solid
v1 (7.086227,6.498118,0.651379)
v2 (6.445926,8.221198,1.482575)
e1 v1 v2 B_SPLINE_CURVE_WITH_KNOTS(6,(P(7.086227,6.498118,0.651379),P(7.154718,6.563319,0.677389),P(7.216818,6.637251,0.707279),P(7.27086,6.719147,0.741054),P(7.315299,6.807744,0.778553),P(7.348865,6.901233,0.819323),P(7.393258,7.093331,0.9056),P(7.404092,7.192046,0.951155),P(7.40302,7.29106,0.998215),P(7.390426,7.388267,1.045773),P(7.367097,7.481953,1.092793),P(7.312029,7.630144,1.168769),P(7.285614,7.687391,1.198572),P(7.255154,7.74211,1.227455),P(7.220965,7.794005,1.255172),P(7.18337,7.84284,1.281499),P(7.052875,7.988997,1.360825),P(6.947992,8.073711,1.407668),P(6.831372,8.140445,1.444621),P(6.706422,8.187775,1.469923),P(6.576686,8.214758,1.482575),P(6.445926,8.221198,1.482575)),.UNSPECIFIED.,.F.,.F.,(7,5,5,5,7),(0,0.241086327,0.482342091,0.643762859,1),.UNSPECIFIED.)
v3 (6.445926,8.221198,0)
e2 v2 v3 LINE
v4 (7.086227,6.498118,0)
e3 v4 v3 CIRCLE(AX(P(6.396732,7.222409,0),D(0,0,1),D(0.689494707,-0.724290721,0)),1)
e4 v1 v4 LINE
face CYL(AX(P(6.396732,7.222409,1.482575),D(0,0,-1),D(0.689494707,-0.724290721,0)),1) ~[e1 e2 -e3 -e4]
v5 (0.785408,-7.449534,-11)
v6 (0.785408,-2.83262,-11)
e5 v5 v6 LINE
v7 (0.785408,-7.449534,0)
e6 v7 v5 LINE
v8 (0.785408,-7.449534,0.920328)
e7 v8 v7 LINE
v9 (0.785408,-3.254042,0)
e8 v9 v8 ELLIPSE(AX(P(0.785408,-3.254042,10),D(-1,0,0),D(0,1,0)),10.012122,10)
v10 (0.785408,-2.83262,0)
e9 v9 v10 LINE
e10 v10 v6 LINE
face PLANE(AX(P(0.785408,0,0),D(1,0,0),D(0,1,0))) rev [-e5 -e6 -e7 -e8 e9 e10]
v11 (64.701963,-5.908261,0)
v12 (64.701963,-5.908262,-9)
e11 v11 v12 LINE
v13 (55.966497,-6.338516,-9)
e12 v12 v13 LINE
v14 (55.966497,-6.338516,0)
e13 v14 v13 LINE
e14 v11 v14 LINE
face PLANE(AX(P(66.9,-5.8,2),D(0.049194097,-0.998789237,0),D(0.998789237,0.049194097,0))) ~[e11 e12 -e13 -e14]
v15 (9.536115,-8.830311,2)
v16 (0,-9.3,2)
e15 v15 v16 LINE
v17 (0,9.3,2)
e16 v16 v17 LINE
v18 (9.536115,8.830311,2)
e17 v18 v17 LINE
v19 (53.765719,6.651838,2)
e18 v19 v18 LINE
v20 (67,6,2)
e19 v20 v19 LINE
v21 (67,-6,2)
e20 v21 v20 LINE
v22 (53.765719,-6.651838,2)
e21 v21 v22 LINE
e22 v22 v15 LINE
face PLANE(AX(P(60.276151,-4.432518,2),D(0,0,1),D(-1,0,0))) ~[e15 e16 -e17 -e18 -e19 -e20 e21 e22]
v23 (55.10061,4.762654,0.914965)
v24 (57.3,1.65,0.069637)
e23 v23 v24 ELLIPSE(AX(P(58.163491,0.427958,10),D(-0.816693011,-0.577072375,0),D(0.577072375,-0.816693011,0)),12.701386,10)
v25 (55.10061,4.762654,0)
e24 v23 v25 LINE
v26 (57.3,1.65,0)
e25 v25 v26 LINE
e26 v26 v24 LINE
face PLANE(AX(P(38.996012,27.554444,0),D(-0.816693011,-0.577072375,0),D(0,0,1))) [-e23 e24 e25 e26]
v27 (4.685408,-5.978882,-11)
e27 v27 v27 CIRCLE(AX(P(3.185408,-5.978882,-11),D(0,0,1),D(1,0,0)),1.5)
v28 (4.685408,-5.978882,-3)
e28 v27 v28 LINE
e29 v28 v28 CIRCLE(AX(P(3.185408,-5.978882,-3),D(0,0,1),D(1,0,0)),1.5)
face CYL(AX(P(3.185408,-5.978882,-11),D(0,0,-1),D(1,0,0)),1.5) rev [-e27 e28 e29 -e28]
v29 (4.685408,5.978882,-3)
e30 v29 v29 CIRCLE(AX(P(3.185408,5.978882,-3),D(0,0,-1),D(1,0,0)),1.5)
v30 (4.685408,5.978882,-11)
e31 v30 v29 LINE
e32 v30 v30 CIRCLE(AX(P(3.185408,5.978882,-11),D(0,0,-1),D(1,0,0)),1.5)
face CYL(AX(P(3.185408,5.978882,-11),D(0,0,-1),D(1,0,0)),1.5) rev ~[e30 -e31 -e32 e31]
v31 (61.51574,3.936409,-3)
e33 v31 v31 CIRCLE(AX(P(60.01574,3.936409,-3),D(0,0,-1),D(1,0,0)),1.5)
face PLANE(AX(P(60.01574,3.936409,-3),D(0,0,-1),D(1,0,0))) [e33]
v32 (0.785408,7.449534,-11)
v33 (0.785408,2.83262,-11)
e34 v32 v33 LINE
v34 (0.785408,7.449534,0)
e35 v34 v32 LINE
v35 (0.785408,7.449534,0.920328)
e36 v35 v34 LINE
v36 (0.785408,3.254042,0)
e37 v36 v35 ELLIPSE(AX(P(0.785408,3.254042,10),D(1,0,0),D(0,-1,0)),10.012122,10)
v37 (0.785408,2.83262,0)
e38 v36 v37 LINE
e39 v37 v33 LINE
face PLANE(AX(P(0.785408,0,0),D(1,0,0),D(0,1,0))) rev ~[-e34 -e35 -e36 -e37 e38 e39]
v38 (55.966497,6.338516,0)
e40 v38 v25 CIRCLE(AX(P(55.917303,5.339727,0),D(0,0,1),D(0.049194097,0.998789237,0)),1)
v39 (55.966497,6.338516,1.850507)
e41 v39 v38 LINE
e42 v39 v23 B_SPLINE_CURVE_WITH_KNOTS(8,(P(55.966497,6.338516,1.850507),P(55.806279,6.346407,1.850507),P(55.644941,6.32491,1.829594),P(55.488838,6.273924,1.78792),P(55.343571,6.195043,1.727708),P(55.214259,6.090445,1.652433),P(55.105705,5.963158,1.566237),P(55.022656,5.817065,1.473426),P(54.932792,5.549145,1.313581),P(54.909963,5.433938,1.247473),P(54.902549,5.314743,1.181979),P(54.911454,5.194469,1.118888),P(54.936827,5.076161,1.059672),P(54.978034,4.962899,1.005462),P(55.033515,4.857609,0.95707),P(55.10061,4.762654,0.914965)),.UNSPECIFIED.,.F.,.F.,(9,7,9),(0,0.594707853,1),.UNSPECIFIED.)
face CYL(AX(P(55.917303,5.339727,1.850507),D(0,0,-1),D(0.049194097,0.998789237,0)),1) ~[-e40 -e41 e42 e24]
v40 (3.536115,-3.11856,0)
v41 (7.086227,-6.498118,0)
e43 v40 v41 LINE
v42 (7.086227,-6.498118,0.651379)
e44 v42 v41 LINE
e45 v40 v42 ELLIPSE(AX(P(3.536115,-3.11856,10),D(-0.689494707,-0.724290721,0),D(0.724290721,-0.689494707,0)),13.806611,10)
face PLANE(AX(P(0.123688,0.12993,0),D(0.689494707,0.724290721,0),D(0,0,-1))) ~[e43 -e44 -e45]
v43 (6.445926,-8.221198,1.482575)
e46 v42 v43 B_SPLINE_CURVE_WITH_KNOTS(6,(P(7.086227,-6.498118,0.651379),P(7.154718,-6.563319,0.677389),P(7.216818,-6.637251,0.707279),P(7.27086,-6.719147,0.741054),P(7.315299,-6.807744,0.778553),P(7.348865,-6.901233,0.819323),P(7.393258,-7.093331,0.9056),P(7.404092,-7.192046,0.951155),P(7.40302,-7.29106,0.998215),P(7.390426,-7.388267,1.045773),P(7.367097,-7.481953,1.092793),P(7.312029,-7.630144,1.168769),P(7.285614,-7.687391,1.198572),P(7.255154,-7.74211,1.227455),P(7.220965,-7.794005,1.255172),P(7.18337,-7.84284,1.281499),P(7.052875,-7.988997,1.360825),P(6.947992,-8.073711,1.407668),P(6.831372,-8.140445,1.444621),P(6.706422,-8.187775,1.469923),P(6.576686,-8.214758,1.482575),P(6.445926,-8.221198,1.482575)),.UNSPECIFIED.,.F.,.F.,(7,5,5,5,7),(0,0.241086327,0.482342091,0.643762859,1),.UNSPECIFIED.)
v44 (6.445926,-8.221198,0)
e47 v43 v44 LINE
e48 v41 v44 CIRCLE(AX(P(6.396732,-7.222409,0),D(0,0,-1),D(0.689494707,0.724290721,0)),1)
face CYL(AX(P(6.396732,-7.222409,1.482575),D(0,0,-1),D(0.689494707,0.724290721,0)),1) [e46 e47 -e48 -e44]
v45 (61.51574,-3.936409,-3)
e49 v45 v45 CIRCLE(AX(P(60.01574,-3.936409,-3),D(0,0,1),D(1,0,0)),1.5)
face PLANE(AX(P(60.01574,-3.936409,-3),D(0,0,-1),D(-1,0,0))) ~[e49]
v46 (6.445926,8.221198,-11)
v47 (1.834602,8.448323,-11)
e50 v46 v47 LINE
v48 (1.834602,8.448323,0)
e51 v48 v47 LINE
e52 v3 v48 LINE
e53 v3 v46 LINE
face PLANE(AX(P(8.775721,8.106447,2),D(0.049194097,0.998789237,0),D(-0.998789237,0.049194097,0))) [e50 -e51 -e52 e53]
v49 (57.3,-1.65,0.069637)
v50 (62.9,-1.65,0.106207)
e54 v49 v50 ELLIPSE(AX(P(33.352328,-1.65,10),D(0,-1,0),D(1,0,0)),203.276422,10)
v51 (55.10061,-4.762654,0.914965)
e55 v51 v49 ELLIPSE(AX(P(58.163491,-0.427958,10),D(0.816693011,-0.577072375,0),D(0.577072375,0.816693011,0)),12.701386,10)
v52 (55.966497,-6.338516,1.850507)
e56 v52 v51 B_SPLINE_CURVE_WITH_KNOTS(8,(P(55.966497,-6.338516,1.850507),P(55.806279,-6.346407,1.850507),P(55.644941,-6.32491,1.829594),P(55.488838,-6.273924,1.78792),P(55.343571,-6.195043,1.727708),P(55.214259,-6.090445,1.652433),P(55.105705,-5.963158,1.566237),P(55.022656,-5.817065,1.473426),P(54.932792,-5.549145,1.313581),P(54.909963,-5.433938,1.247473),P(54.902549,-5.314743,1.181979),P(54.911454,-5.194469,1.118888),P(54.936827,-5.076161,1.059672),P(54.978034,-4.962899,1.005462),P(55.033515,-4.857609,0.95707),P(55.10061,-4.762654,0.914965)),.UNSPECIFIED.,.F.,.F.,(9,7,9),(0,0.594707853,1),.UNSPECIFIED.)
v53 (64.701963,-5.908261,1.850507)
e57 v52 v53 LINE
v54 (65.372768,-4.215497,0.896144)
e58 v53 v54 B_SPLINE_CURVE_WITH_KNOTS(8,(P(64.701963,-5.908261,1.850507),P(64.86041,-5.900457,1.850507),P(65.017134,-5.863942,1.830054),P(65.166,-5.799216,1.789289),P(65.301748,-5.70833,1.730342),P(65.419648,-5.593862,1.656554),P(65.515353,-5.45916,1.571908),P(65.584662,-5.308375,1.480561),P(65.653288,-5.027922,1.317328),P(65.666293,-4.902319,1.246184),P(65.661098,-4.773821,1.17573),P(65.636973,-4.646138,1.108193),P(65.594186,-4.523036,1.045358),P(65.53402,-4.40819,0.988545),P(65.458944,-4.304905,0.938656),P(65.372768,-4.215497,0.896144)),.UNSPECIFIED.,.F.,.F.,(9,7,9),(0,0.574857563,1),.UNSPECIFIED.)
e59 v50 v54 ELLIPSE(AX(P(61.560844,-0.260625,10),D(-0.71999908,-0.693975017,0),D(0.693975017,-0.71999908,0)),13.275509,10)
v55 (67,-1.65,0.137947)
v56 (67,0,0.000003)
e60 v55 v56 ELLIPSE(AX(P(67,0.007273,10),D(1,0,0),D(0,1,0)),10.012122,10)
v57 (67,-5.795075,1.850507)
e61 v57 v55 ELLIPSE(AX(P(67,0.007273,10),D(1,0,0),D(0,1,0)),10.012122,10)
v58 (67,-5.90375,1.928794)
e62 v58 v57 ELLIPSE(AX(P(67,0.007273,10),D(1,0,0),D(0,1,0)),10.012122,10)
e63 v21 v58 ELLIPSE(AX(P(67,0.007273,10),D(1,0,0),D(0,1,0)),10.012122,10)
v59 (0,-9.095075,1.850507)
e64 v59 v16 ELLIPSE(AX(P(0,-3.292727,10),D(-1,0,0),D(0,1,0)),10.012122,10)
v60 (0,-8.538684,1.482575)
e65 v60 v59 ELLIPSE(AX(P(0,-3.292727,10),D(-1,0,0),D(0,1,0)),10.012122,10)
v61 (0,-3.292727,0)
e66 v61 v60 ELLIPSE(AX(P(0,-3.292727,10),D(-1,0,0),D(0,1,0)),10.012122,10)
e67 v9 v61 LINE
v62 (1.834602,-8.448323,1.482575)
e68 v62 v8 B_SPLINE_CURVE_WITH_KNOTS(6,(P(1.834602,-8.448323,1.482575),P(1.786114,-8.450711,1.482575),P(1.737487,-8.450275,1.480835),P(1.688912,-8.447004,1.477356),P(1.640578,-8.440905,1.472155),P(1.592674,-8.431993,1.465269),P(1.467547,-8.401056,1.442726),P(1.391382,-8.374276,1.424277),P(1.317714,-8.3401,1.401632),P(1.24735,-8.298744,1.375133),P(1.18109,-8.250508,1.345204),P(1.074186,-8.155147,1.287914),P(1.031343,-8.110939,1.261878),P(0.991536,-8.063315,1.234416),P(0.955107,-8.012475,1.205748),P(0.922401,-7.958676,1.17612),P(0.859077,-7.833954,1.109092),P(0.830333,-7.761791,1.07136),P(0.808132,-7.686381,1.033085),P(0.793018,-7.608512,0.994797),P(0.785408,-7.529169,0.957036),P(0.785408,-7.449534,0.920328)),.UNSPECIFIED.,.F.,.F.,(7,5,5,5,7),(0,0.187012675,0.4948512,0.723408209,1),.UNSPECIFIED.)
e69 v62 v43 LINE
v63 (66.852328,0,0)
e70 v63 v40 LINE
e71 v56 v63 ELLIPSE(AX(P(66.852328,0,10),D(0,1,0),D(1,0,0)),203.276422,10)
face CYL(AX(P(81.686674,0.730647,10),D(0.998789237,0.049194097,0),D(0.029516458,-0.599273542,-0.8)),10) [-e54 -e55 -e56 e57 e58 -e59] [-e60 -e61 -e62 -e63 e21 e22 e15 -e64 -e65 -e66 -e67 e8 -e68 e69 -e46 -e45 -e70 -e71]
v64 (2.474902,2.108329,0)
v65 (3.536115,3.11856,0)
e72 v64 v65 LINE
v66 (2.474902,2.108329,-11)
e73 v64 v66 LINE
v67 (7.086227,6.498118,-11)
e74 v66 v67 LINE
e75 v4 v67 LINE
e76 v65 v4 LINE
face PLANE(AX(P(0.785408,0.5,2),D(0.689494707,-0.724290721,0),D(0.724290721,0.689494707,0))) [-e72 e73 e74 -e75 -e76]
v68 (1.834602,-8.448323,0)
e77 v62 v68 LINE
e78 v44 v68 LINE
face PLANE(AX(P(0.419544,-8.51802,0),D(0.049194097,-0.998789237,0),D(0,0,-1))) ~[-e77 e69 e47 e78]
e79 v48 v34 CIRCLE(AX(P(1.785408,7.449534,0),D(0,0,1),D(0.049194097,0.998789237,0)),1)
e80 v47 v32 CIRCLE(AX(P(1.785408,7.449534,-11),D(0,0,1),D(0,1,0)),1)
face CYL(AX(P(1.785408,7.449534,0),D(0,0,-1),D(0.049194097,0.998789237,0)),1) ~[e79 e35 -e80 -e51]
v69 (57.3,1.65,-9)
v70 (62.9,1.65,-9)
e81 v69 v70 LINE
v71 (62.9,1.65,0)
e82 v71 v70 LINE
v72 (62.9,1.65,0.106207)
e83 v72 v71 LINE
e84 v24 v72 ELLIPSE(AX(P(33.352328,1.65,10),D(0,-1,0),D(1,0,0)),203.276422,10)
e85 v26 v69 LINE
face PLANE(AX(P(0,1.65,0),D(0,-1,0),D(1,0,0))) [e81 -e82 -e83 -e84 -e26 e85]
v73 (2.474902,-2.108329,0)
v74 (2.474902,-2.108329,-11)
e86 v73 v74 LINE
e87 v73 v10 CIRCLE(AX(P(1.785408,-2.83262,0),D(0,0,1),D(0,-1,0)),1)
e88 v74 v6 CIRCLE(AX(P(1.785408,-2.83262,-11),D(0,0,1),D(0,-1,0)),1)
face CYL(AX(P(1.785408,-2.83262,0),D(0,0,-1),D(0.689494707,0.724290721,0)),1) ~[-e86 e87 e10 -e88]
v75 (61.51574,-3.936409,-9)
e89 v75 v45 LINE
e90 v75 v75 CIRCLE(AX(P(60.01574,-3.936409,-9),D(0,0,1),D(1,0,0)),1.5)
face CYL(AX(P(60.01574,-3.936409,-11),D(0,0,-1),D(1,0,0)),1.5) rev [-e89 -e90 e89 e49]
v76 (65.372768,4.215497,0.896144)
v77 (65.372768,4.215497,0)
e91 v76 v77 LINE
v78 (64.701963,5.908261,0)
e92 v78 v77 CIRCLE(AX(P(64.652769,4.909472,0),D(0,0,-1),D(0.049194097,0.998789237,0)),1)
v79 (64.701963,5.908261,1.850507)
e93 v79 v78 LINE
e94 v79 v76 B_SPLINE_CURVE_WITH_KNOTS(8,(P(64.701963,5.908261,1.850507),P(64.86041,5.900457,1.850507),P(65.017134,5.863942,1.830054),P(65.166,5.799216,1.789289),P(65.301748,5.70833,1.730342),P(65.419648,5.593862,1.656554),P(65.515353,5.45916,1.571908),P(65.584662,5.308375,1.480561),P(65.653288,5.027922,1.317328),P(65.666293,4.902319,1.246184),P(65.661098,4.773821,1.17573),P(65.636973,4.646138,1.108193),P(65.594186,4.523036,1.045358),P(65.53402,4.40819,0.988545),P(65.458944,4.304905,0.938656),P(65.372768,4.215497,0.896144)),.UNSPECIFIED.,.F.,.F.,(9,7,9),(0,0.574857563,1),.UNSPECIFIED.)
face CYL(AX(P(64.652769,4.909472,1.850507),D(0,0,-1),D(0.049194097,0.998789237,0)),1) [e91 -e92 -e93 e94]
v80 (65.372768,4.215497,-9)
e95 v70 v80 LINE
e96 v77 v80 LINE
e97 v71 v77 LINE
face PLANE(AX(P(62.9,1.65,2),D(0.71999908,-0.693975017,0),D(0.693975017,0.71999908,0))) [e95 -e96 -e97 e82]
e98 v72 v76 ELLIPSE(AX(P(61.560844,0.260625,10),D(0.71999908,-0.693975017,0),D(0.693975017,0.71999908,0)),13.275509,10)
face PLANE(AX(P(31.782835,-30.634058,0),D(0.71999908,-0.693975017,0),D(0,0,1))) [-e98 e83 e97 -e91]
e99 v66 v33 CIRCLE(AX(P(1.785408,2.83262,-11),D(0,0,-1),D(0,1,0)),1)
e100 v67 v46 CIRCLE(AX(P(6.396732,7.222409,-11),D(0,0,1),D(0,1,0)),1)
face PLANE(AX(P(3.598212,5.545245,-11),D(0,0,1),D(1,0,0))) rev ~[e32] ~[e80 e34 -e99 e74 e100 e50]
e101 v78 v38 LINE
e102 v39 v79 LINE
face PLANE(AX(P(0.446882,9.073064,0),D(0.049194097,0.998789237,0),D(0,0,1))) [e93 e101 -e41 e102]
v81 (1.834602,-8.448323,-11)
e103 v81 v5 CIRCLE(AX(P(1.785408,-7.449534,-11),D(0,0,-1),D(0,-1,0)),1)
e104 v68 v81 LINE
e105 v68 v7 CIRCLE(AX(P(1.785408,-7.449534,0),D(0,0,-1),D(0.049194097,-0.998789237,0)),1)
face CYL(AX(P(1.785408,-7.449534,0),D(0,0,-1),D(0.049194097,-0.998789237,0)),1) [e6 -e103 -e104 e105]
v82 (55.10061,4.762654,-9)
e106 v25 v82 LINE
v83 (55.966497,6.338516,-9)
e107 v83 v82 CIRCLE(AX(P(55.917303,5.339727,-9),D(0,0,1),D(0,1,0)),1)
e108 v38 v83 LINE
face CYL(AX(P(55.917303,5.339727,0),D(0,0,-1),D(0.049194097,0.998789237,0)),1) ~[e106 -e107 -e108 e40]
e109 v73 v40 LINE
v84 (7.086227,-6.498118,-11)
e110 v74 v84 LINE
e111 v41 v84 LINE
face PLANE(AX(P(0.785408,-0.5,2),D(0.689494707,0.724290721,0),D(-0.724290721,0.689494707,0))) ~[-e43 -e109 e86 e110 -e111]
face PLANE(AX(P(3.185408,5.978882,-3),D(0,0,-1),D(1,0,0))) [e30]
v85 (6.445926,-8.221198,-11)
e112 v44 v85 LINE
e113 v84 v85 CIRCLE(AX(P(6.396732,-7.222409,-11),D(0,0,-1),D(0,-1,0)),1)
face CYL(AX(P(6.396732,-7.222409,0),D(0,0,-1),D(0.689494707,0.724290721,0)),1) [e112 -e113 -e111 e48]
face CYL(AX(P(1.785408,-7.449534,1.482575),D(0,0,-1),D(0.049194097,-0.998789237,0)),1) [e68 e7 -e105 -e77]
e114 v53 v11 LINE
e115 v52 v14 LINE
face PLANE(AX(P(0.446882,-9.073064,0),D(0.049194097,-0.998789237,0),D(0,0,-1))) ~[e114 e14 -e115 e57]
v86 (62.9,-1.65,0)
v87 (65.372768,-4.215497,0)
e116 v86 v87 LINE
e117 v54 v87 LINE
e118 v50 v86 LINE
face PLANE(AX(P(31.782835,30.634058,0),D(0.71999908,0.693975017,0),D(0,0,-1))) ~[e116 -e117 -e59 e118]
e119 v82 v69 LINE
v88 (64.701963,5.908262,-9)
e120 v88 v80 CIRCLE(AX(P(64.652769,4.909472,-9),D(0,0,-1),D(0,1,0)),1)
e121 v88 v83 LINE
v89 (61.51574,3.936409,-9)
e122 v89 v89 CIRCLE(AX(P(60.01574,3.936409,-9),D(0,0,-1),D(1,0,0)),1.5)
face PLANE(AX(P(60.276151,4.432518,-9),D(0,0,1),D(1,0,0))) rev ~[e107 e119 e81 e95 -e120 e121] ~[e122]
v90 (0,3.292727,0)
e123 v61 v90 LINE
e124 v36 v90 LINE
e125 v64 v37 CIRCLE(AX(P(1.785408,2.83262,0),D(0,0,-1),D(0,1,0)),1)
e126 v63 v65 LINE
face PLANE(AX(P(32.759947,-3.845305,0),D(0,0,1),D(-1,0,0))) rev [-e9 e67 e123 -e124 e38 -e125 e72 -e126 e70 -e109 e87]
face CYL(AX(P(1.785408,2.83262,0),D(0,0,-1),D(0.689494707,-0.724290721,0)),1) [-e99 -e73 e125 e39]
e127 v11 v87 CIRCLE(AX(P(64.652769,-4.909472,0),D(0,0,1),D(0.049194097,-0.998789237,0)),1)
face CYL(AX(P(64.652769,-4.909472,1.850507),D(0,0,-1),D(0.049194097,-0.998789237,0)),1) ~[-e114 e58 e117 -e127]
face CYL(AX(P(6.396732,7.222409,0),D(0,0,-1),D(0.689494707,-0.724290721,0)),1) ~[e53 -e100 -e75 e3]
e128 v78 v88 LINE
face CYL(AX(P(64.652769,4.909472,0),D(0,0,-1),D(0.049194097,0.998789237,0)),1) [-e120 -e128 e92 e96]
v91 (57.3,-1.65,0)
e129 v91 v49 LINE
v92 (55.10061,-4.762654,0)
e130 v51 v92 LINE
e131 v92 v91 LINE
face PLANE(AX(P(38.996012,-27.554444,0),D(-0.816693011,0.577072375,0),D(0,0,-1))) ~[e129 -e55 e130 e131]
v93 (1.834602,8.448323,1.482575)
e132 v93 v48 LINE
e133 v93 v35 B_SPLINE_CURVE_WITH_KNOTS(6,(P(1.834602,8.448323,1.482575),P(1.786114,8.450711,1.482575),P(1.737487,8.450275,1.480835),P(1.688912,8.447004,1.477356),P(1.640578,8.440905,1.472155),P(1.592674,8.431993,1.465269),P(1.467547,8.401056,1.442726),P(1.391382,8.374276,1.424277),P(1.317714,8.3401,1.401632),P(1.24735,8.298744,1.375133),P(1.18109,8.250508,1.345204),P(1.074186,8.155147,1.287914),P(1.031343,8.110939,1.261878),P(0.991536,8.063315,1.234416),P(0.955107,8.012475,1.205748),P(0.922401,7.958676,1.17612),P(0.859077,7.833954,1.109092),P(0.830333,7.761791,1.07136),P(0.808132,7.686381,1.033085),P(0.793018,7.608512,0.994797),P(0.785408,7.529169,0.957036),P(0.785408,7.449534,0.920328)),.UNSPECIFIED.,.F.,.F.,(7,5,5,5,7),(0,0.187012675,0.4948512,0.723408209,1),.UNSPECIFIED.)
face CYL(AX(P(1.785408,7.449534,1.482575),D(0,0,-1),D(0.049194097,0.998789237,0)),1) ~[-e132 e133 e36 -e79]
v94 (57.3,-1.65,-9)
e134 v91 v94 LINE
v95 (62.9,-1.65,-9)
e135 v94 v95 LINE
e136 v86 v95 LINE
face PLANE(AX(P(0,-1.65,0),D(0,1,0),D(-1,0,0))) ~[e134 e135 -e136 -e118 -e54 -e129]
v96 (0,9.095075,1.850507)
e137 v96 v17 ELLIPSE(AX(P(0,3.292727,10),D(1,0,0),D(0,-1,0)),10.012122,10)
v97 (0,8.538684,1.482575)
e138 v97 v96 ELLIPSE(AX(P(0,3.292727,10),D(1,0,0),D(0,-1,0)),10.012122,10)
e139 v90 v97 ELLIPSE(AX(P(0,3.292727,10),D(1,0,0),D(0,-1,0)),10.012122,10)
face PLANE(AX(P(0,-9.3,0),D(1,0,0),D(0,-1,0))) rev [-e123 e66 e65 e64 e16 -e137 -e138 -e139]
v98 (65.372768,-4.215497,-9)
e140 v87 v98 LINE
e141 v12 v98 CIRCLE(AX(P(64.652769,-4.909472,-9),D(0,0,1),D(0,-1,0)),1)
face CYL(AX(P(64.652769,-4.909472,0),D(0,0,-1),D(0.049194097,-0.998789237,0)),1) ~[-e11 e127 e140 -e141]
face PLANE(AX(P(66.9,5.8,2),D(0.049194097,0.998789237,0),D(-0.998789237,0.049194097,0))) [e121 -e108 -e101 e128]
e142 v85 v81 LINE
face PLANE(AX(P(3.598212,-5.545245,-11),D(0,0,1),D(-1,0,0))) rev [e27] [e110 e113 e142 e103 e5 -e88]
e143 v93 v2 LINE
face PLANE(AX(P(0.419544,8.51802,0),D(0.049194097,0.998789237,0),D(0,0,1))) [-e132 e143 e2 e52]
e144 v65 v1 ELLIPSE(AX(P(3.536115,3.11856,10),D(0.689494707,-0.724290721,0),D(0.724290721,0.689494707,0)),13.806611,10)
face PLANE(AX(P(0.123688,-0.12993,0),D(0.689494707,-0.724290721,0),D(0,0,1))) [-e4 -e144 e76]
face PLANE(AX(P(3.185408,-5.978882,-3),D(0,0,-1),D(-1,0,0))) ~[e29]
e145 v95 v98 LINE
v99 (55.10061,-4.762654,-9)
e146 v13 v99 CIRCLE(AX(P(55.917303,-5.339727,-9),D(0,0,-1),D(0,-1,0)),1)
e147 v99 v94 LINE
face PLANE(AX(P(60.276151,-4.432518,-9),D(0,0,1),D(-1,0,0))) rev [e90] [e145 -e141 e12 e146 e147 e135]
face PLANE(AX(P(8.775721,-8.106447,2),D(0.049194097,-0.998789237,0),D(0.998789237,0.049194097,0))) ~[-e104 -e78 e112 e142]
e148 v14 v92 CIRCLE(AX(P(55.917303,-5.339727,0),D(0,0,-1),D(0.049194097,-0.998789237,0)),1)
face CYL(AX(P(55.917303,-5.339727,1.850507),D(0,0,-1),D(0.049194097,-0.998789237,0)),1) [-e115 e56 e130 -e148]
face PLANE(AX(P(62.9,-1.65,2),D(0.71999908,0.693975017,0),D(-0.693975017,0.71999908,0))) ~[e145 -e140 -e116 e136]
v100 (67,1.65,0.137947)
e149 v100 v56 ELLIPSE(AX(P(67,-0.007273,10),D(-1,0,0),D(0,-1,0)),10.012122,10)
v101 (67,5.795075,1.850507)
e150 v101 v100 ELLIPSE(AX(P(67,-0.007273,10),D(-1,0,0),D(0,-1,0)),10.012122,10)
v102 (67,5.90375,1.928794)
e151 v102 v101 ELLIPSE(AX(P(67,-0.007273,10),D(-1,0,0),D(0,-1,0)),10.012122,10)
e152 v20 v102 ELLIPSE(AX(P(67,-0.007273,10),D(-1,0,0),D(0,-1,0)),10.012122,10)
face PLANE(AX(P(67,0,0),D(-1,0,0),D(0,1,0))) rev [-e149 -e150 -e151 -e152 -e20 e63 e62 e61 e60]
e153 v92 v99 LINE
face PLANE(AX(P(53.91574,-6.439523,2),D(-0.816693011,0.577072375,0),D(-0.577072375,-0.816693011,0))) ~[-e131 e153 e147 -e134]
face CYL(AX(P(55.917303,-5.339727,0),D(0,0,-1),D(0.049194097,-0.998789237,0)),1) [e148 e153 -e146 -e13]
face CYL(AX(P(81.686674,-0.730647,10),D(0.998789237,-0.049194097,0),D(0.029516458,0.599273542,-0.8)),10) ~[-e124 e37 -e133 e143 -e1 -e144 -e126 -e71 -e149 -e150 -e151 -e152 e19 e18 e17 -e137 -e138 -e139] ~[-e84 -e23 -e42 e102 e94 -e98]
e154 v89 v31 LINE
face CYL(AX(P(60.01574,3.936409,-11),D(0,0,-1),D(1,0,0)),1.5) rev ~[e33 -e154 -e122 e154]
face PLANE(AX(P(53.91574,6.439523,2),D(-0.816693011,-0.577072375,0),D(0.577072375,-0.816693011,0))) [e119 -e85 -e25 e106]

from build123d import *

# Parameters (mm, degrees)
F1_DEPTH     = 2
F3_DEPTH     = 13
F4_DEPTH     = 11
F5_R         = 1.5
F6_DEPTH     = 8
F7_T4_DEPTH  = 97.0812194284
F7_T9_DEPTH  = 97.0812194284
F7_T14_DEPTH = 97.0812194284
F7_T20_DEPTH = 97.0812194284
F7_T25_DEPTH = 97.0812194284
F7_T31_DEPTH = 97.0812194284
F8_R         = 1


# Not quite as in the source:
# - a fillet or chamfer that OpenCascade refuses, or shapes differently, is made with other operations: its cross-section is extruded or revolved along the edge and cut away or added


with BuildPart() as f1:
    # F0 (on Top) → F1 (new body)
    with BuildSketch(Plane.XY):
        Polygon((0, 9.3), (0, 0), (67, 0), (67, 6), align=None)
    extrude(amount=F1_DEPTH)

    # F2 (on face) → F3 (join)
    with BuildSketch(Plane.XY.offset(2)):
        Polygon((0.7854075007, 8.5), (0.7854075007, 0.5), (8.7757214003, 8.1064472258), align=None)
    extrude(amount=-F3_DEPTH)

    # F2 (on face) → F4 (join)
    with BuildSketch(Plane.XY.offset(2)):
        Polygon((62.9, 1.65), (66.9, 5.8), (53.9157399132, 6.439523258), (57.3, 1.65), align=None)
    extrude(amount=-F4_DEPTH)

    # F5 (on face) → F6 (cut)
    with BuildSketch(Plane(origin=(0, 0, -11), x_dir=(1, 0, 0), z_dir=(0, 0, -1))):
        with Locations((3.1854075007, -5.9788816921)):
            Circle(F5_R)
        with Locations((60.0157399132, -3.9364085902)):
            Circle(F5_R)
    extrude(amount=-F6_DEPTH, mode=Mode.SUBTRACT)

    # F7: fillet of radius 10 on 1 edges, made by hand


with BuildPart() as f7_tool2:
    # F7_s3 → F7_t4 (new body)
    with BuildSketch(Plane(origin=(81.5248873918, -4.0154049014, 0), x_dir=(0, 0, 1), z_dir=(-0.9987892374, 0.0491940968, 0))):
        with BuildLine():
            ThreePointArc((2, 9.2887399083), (0.5131670195, 6.4510175684), (0, 3.2887399083))
            Line((0, 3.2887399083), (0, 9.2887399083))
            Line((0, 9.2887399083), (2, 9.2887399083))
        make_face()
    extrude(amount=F7_T4_DEPTH)

    split(bisect_by=Plane(origin=(0.4468822571, 9.0730640082, 0), x_dir=(0, 0, 1), z_dir=(0.0491940968, 0.9987892374, 0)), keep=Keep.TOP)


with BuildPart() as f1_1:
    add(f1.part)

    # F7_t1: cut F7_tool2
    add(f7_tool2.part, mode=Mode.SUBTRACT)


with BuildPart() as f7_tool7:
    # F7_s8 → F7_t9 (new body)
    with BuildSketch(Plane(origin=(81.5248873918, -4.0154049014, 0), x_dir=(0, 0, 1), z_dir=(-0.9987892374, 0.0491940968, 0))):
        with BuildLine():
            ThreePointArc((2, 9.2887399083), (0.5131670195, 6.4510175684), (0, 3.2887399083))
            Line((0, 3.2887399083), (0, 9.2887399083))
            Line((0, 9.2887399083), (2, 9.2887399083))
        make_face()
    extrude(amount=F7_T9_DEPTH)

    split(bisect_by=Plane(origin=(31.7828354278, -30.6340582437, 0), x_dir=(0, 0, 1), z_dir=(0.7199990803, -0.6939750171, 0)), keep=Keep.TOP)


with BuildPart() as f1_2:
    add(f1_1.part)

    # F7_t6: cut F7_tool7
    add(f7_tool7.part, mode=Mode.SUBTRACT)


with BuildPart() as f7_tool12:
    # F7_s13 → F7_t14 (new body)
    with BuildSketch(Plane(origin=(81.5248873918, -4.0154049014, 0), x_dir=(0, 0, 1), z_dir=(-0.9987892374, 0.0491940968, 0))):
        with BuildLine():
            ThreePointArc((2, 9.2887399083), (0.5131670195, 6.4510175684), (0, 3.2887399083))
            Line((0, 3.2887399083), (0, 9.2887399083))
            Line((0, 9.2887399083), (2, 9.2887399083))
        make_face()
    extrude(amount=F7_T14_DEPTH)

    split(bisect_by=Plane(origin=(38.996012386, 27.554443554, 0), x_dir=(0, 0, 1), z_dir=(-0.816693011, -0.5770723748, 0)), keep=Keep.TOP)

    split(bisect_by=Plane(origin=(0.1236877347, -0.1299297552, 0), x_dir=(0, 0, 1), z_dir=(0.6894947075, -0.7242907209, 0)), keep=Keep.TOP)


with BuildPart() as f1_3:
    add(f1_2.part)

    # F7_t11: cut F7_tool12
    add(f7_tool12.part, mode=Mode.SUBTRACT)


with BuildPart() as f7_tool18:
    # F7_s19 → F7_t20 (new body)
    with BuildSketch(Plane(origin=(81.5248873918, -4.0154049014, 0), x_dir=(0, 0, 1), z_dir=(-0.9987892374, 0.0491940968, 0))):
        with BuildLine():
            ThreePointArc((2, 9.2887399083), (0.5131670195, 6.4510175684), (0, 3.2887399083))
            Line((0, 3.2887399083), (0, 9.2887399083))
            Line((0, 9.2887399083), (2, 9.2887399083))
        make_face()
    extrude(amount=F7_T20_DEPTH)

    split(bisect_by=Plane.XZ.offset(-1.65), keep=Keep.TOP)


with BuildPart() as f1_4:
    add(f1_3.part)

    # F7_t17: cut F7_tool18
    add(f7_tool18.part, mode=Mode.SUBTRACT)


with BuildPart() as f7_tool23:
    # F7_s24 → F7_t25 (new body)
    with BuildSketch(Plane(origin=(81.5248873918, -4.0154049014, 0), x_dir=(0, 0, 1), z_dir=(-0.9987892374, 0.0491940968, 0))):
        with BuildLine():
            ThreePointArc((2, 9.2887399083), (0.5131670195, 6.4510175684), (0, 3.2887399083))
            Line((0, 3.2887399083), (0, 9.2887399083))
            Line((0, 9.2887399083), (2, 9.2887399083))
        make_face()
    extrude(amount=F7_T25_DEPTH)

    split(bisect_by=Plane(origin=(0.419544275, 8.518020129, 0), x_dir=(0, 0, 1), z_dir=(0.0491940968, 0.9987892374, 0)), keep=Keep.TOP)

    split(bisect_by=Plane(origin=(0.1236877347, -0.1299297552, 0), x_dir=(0, 0, 1), z_dir=(-0.6894947075, 0.7242907209, 0)), keep=Keep.TOP)


with BuildPart() as f1_5:
    add(f1_4.part)

    # F7_t22: cut F7_tool23
    add(f7_tool23.part, mode=Mode.SUBTRACT)


with BuildPart() as f7_tool29:
    # F7_s30 → F7_t31 (new body)
    with BuildSketch(Plane(origin=(81.5248873918, -4.0154049014, 0), x_dir=(0, 0, 1), z_dir=(-0.9987892374, 0.0491940968, 0))):
        with BuildLine():
            ThreePointArc((2, 9.2887399083), (0.5131670195, 6.4510175684), (0, 3.2887399083))
            Line((0, 3.2887399083), (0, 9.2887399083))
            Line((0, 9.2887399083), (2, 9.2887399083))
        make_face()
    extrude(amount=F7_T31_DEPTH)

    split(bisect_by=Plane.YZ.offset(0.7854075007), keep=Keep.BOTTOM)


with BuildPart() as f1_6:
    add(f1_5.part)

    # F7_t28: cut F7_tool29
    add(f7_tool29.part, mode=Mode.SUBTRACT)

    # F8
    f8_edges = [f1_6.edges().sort_by_distance(p)[0] for p in [
        (0.785408, 8.5, -4.758713),
        (8.775721, 8.106447, -4.758713),
        (0.785408, 0.5, -5.5),
        (66.9, 5.8, -3.574746),
        (53.91574, 6.439523, -3.574746),
    ]]
    fillet(f8_edges, radius=F8_R)

    # F9: F1 across plane


with BuildPart() as f1_7:
    add(f1_6.part)
    add(f1_6.part.mirror(Plane.XZ))


solid = f1_7.part
